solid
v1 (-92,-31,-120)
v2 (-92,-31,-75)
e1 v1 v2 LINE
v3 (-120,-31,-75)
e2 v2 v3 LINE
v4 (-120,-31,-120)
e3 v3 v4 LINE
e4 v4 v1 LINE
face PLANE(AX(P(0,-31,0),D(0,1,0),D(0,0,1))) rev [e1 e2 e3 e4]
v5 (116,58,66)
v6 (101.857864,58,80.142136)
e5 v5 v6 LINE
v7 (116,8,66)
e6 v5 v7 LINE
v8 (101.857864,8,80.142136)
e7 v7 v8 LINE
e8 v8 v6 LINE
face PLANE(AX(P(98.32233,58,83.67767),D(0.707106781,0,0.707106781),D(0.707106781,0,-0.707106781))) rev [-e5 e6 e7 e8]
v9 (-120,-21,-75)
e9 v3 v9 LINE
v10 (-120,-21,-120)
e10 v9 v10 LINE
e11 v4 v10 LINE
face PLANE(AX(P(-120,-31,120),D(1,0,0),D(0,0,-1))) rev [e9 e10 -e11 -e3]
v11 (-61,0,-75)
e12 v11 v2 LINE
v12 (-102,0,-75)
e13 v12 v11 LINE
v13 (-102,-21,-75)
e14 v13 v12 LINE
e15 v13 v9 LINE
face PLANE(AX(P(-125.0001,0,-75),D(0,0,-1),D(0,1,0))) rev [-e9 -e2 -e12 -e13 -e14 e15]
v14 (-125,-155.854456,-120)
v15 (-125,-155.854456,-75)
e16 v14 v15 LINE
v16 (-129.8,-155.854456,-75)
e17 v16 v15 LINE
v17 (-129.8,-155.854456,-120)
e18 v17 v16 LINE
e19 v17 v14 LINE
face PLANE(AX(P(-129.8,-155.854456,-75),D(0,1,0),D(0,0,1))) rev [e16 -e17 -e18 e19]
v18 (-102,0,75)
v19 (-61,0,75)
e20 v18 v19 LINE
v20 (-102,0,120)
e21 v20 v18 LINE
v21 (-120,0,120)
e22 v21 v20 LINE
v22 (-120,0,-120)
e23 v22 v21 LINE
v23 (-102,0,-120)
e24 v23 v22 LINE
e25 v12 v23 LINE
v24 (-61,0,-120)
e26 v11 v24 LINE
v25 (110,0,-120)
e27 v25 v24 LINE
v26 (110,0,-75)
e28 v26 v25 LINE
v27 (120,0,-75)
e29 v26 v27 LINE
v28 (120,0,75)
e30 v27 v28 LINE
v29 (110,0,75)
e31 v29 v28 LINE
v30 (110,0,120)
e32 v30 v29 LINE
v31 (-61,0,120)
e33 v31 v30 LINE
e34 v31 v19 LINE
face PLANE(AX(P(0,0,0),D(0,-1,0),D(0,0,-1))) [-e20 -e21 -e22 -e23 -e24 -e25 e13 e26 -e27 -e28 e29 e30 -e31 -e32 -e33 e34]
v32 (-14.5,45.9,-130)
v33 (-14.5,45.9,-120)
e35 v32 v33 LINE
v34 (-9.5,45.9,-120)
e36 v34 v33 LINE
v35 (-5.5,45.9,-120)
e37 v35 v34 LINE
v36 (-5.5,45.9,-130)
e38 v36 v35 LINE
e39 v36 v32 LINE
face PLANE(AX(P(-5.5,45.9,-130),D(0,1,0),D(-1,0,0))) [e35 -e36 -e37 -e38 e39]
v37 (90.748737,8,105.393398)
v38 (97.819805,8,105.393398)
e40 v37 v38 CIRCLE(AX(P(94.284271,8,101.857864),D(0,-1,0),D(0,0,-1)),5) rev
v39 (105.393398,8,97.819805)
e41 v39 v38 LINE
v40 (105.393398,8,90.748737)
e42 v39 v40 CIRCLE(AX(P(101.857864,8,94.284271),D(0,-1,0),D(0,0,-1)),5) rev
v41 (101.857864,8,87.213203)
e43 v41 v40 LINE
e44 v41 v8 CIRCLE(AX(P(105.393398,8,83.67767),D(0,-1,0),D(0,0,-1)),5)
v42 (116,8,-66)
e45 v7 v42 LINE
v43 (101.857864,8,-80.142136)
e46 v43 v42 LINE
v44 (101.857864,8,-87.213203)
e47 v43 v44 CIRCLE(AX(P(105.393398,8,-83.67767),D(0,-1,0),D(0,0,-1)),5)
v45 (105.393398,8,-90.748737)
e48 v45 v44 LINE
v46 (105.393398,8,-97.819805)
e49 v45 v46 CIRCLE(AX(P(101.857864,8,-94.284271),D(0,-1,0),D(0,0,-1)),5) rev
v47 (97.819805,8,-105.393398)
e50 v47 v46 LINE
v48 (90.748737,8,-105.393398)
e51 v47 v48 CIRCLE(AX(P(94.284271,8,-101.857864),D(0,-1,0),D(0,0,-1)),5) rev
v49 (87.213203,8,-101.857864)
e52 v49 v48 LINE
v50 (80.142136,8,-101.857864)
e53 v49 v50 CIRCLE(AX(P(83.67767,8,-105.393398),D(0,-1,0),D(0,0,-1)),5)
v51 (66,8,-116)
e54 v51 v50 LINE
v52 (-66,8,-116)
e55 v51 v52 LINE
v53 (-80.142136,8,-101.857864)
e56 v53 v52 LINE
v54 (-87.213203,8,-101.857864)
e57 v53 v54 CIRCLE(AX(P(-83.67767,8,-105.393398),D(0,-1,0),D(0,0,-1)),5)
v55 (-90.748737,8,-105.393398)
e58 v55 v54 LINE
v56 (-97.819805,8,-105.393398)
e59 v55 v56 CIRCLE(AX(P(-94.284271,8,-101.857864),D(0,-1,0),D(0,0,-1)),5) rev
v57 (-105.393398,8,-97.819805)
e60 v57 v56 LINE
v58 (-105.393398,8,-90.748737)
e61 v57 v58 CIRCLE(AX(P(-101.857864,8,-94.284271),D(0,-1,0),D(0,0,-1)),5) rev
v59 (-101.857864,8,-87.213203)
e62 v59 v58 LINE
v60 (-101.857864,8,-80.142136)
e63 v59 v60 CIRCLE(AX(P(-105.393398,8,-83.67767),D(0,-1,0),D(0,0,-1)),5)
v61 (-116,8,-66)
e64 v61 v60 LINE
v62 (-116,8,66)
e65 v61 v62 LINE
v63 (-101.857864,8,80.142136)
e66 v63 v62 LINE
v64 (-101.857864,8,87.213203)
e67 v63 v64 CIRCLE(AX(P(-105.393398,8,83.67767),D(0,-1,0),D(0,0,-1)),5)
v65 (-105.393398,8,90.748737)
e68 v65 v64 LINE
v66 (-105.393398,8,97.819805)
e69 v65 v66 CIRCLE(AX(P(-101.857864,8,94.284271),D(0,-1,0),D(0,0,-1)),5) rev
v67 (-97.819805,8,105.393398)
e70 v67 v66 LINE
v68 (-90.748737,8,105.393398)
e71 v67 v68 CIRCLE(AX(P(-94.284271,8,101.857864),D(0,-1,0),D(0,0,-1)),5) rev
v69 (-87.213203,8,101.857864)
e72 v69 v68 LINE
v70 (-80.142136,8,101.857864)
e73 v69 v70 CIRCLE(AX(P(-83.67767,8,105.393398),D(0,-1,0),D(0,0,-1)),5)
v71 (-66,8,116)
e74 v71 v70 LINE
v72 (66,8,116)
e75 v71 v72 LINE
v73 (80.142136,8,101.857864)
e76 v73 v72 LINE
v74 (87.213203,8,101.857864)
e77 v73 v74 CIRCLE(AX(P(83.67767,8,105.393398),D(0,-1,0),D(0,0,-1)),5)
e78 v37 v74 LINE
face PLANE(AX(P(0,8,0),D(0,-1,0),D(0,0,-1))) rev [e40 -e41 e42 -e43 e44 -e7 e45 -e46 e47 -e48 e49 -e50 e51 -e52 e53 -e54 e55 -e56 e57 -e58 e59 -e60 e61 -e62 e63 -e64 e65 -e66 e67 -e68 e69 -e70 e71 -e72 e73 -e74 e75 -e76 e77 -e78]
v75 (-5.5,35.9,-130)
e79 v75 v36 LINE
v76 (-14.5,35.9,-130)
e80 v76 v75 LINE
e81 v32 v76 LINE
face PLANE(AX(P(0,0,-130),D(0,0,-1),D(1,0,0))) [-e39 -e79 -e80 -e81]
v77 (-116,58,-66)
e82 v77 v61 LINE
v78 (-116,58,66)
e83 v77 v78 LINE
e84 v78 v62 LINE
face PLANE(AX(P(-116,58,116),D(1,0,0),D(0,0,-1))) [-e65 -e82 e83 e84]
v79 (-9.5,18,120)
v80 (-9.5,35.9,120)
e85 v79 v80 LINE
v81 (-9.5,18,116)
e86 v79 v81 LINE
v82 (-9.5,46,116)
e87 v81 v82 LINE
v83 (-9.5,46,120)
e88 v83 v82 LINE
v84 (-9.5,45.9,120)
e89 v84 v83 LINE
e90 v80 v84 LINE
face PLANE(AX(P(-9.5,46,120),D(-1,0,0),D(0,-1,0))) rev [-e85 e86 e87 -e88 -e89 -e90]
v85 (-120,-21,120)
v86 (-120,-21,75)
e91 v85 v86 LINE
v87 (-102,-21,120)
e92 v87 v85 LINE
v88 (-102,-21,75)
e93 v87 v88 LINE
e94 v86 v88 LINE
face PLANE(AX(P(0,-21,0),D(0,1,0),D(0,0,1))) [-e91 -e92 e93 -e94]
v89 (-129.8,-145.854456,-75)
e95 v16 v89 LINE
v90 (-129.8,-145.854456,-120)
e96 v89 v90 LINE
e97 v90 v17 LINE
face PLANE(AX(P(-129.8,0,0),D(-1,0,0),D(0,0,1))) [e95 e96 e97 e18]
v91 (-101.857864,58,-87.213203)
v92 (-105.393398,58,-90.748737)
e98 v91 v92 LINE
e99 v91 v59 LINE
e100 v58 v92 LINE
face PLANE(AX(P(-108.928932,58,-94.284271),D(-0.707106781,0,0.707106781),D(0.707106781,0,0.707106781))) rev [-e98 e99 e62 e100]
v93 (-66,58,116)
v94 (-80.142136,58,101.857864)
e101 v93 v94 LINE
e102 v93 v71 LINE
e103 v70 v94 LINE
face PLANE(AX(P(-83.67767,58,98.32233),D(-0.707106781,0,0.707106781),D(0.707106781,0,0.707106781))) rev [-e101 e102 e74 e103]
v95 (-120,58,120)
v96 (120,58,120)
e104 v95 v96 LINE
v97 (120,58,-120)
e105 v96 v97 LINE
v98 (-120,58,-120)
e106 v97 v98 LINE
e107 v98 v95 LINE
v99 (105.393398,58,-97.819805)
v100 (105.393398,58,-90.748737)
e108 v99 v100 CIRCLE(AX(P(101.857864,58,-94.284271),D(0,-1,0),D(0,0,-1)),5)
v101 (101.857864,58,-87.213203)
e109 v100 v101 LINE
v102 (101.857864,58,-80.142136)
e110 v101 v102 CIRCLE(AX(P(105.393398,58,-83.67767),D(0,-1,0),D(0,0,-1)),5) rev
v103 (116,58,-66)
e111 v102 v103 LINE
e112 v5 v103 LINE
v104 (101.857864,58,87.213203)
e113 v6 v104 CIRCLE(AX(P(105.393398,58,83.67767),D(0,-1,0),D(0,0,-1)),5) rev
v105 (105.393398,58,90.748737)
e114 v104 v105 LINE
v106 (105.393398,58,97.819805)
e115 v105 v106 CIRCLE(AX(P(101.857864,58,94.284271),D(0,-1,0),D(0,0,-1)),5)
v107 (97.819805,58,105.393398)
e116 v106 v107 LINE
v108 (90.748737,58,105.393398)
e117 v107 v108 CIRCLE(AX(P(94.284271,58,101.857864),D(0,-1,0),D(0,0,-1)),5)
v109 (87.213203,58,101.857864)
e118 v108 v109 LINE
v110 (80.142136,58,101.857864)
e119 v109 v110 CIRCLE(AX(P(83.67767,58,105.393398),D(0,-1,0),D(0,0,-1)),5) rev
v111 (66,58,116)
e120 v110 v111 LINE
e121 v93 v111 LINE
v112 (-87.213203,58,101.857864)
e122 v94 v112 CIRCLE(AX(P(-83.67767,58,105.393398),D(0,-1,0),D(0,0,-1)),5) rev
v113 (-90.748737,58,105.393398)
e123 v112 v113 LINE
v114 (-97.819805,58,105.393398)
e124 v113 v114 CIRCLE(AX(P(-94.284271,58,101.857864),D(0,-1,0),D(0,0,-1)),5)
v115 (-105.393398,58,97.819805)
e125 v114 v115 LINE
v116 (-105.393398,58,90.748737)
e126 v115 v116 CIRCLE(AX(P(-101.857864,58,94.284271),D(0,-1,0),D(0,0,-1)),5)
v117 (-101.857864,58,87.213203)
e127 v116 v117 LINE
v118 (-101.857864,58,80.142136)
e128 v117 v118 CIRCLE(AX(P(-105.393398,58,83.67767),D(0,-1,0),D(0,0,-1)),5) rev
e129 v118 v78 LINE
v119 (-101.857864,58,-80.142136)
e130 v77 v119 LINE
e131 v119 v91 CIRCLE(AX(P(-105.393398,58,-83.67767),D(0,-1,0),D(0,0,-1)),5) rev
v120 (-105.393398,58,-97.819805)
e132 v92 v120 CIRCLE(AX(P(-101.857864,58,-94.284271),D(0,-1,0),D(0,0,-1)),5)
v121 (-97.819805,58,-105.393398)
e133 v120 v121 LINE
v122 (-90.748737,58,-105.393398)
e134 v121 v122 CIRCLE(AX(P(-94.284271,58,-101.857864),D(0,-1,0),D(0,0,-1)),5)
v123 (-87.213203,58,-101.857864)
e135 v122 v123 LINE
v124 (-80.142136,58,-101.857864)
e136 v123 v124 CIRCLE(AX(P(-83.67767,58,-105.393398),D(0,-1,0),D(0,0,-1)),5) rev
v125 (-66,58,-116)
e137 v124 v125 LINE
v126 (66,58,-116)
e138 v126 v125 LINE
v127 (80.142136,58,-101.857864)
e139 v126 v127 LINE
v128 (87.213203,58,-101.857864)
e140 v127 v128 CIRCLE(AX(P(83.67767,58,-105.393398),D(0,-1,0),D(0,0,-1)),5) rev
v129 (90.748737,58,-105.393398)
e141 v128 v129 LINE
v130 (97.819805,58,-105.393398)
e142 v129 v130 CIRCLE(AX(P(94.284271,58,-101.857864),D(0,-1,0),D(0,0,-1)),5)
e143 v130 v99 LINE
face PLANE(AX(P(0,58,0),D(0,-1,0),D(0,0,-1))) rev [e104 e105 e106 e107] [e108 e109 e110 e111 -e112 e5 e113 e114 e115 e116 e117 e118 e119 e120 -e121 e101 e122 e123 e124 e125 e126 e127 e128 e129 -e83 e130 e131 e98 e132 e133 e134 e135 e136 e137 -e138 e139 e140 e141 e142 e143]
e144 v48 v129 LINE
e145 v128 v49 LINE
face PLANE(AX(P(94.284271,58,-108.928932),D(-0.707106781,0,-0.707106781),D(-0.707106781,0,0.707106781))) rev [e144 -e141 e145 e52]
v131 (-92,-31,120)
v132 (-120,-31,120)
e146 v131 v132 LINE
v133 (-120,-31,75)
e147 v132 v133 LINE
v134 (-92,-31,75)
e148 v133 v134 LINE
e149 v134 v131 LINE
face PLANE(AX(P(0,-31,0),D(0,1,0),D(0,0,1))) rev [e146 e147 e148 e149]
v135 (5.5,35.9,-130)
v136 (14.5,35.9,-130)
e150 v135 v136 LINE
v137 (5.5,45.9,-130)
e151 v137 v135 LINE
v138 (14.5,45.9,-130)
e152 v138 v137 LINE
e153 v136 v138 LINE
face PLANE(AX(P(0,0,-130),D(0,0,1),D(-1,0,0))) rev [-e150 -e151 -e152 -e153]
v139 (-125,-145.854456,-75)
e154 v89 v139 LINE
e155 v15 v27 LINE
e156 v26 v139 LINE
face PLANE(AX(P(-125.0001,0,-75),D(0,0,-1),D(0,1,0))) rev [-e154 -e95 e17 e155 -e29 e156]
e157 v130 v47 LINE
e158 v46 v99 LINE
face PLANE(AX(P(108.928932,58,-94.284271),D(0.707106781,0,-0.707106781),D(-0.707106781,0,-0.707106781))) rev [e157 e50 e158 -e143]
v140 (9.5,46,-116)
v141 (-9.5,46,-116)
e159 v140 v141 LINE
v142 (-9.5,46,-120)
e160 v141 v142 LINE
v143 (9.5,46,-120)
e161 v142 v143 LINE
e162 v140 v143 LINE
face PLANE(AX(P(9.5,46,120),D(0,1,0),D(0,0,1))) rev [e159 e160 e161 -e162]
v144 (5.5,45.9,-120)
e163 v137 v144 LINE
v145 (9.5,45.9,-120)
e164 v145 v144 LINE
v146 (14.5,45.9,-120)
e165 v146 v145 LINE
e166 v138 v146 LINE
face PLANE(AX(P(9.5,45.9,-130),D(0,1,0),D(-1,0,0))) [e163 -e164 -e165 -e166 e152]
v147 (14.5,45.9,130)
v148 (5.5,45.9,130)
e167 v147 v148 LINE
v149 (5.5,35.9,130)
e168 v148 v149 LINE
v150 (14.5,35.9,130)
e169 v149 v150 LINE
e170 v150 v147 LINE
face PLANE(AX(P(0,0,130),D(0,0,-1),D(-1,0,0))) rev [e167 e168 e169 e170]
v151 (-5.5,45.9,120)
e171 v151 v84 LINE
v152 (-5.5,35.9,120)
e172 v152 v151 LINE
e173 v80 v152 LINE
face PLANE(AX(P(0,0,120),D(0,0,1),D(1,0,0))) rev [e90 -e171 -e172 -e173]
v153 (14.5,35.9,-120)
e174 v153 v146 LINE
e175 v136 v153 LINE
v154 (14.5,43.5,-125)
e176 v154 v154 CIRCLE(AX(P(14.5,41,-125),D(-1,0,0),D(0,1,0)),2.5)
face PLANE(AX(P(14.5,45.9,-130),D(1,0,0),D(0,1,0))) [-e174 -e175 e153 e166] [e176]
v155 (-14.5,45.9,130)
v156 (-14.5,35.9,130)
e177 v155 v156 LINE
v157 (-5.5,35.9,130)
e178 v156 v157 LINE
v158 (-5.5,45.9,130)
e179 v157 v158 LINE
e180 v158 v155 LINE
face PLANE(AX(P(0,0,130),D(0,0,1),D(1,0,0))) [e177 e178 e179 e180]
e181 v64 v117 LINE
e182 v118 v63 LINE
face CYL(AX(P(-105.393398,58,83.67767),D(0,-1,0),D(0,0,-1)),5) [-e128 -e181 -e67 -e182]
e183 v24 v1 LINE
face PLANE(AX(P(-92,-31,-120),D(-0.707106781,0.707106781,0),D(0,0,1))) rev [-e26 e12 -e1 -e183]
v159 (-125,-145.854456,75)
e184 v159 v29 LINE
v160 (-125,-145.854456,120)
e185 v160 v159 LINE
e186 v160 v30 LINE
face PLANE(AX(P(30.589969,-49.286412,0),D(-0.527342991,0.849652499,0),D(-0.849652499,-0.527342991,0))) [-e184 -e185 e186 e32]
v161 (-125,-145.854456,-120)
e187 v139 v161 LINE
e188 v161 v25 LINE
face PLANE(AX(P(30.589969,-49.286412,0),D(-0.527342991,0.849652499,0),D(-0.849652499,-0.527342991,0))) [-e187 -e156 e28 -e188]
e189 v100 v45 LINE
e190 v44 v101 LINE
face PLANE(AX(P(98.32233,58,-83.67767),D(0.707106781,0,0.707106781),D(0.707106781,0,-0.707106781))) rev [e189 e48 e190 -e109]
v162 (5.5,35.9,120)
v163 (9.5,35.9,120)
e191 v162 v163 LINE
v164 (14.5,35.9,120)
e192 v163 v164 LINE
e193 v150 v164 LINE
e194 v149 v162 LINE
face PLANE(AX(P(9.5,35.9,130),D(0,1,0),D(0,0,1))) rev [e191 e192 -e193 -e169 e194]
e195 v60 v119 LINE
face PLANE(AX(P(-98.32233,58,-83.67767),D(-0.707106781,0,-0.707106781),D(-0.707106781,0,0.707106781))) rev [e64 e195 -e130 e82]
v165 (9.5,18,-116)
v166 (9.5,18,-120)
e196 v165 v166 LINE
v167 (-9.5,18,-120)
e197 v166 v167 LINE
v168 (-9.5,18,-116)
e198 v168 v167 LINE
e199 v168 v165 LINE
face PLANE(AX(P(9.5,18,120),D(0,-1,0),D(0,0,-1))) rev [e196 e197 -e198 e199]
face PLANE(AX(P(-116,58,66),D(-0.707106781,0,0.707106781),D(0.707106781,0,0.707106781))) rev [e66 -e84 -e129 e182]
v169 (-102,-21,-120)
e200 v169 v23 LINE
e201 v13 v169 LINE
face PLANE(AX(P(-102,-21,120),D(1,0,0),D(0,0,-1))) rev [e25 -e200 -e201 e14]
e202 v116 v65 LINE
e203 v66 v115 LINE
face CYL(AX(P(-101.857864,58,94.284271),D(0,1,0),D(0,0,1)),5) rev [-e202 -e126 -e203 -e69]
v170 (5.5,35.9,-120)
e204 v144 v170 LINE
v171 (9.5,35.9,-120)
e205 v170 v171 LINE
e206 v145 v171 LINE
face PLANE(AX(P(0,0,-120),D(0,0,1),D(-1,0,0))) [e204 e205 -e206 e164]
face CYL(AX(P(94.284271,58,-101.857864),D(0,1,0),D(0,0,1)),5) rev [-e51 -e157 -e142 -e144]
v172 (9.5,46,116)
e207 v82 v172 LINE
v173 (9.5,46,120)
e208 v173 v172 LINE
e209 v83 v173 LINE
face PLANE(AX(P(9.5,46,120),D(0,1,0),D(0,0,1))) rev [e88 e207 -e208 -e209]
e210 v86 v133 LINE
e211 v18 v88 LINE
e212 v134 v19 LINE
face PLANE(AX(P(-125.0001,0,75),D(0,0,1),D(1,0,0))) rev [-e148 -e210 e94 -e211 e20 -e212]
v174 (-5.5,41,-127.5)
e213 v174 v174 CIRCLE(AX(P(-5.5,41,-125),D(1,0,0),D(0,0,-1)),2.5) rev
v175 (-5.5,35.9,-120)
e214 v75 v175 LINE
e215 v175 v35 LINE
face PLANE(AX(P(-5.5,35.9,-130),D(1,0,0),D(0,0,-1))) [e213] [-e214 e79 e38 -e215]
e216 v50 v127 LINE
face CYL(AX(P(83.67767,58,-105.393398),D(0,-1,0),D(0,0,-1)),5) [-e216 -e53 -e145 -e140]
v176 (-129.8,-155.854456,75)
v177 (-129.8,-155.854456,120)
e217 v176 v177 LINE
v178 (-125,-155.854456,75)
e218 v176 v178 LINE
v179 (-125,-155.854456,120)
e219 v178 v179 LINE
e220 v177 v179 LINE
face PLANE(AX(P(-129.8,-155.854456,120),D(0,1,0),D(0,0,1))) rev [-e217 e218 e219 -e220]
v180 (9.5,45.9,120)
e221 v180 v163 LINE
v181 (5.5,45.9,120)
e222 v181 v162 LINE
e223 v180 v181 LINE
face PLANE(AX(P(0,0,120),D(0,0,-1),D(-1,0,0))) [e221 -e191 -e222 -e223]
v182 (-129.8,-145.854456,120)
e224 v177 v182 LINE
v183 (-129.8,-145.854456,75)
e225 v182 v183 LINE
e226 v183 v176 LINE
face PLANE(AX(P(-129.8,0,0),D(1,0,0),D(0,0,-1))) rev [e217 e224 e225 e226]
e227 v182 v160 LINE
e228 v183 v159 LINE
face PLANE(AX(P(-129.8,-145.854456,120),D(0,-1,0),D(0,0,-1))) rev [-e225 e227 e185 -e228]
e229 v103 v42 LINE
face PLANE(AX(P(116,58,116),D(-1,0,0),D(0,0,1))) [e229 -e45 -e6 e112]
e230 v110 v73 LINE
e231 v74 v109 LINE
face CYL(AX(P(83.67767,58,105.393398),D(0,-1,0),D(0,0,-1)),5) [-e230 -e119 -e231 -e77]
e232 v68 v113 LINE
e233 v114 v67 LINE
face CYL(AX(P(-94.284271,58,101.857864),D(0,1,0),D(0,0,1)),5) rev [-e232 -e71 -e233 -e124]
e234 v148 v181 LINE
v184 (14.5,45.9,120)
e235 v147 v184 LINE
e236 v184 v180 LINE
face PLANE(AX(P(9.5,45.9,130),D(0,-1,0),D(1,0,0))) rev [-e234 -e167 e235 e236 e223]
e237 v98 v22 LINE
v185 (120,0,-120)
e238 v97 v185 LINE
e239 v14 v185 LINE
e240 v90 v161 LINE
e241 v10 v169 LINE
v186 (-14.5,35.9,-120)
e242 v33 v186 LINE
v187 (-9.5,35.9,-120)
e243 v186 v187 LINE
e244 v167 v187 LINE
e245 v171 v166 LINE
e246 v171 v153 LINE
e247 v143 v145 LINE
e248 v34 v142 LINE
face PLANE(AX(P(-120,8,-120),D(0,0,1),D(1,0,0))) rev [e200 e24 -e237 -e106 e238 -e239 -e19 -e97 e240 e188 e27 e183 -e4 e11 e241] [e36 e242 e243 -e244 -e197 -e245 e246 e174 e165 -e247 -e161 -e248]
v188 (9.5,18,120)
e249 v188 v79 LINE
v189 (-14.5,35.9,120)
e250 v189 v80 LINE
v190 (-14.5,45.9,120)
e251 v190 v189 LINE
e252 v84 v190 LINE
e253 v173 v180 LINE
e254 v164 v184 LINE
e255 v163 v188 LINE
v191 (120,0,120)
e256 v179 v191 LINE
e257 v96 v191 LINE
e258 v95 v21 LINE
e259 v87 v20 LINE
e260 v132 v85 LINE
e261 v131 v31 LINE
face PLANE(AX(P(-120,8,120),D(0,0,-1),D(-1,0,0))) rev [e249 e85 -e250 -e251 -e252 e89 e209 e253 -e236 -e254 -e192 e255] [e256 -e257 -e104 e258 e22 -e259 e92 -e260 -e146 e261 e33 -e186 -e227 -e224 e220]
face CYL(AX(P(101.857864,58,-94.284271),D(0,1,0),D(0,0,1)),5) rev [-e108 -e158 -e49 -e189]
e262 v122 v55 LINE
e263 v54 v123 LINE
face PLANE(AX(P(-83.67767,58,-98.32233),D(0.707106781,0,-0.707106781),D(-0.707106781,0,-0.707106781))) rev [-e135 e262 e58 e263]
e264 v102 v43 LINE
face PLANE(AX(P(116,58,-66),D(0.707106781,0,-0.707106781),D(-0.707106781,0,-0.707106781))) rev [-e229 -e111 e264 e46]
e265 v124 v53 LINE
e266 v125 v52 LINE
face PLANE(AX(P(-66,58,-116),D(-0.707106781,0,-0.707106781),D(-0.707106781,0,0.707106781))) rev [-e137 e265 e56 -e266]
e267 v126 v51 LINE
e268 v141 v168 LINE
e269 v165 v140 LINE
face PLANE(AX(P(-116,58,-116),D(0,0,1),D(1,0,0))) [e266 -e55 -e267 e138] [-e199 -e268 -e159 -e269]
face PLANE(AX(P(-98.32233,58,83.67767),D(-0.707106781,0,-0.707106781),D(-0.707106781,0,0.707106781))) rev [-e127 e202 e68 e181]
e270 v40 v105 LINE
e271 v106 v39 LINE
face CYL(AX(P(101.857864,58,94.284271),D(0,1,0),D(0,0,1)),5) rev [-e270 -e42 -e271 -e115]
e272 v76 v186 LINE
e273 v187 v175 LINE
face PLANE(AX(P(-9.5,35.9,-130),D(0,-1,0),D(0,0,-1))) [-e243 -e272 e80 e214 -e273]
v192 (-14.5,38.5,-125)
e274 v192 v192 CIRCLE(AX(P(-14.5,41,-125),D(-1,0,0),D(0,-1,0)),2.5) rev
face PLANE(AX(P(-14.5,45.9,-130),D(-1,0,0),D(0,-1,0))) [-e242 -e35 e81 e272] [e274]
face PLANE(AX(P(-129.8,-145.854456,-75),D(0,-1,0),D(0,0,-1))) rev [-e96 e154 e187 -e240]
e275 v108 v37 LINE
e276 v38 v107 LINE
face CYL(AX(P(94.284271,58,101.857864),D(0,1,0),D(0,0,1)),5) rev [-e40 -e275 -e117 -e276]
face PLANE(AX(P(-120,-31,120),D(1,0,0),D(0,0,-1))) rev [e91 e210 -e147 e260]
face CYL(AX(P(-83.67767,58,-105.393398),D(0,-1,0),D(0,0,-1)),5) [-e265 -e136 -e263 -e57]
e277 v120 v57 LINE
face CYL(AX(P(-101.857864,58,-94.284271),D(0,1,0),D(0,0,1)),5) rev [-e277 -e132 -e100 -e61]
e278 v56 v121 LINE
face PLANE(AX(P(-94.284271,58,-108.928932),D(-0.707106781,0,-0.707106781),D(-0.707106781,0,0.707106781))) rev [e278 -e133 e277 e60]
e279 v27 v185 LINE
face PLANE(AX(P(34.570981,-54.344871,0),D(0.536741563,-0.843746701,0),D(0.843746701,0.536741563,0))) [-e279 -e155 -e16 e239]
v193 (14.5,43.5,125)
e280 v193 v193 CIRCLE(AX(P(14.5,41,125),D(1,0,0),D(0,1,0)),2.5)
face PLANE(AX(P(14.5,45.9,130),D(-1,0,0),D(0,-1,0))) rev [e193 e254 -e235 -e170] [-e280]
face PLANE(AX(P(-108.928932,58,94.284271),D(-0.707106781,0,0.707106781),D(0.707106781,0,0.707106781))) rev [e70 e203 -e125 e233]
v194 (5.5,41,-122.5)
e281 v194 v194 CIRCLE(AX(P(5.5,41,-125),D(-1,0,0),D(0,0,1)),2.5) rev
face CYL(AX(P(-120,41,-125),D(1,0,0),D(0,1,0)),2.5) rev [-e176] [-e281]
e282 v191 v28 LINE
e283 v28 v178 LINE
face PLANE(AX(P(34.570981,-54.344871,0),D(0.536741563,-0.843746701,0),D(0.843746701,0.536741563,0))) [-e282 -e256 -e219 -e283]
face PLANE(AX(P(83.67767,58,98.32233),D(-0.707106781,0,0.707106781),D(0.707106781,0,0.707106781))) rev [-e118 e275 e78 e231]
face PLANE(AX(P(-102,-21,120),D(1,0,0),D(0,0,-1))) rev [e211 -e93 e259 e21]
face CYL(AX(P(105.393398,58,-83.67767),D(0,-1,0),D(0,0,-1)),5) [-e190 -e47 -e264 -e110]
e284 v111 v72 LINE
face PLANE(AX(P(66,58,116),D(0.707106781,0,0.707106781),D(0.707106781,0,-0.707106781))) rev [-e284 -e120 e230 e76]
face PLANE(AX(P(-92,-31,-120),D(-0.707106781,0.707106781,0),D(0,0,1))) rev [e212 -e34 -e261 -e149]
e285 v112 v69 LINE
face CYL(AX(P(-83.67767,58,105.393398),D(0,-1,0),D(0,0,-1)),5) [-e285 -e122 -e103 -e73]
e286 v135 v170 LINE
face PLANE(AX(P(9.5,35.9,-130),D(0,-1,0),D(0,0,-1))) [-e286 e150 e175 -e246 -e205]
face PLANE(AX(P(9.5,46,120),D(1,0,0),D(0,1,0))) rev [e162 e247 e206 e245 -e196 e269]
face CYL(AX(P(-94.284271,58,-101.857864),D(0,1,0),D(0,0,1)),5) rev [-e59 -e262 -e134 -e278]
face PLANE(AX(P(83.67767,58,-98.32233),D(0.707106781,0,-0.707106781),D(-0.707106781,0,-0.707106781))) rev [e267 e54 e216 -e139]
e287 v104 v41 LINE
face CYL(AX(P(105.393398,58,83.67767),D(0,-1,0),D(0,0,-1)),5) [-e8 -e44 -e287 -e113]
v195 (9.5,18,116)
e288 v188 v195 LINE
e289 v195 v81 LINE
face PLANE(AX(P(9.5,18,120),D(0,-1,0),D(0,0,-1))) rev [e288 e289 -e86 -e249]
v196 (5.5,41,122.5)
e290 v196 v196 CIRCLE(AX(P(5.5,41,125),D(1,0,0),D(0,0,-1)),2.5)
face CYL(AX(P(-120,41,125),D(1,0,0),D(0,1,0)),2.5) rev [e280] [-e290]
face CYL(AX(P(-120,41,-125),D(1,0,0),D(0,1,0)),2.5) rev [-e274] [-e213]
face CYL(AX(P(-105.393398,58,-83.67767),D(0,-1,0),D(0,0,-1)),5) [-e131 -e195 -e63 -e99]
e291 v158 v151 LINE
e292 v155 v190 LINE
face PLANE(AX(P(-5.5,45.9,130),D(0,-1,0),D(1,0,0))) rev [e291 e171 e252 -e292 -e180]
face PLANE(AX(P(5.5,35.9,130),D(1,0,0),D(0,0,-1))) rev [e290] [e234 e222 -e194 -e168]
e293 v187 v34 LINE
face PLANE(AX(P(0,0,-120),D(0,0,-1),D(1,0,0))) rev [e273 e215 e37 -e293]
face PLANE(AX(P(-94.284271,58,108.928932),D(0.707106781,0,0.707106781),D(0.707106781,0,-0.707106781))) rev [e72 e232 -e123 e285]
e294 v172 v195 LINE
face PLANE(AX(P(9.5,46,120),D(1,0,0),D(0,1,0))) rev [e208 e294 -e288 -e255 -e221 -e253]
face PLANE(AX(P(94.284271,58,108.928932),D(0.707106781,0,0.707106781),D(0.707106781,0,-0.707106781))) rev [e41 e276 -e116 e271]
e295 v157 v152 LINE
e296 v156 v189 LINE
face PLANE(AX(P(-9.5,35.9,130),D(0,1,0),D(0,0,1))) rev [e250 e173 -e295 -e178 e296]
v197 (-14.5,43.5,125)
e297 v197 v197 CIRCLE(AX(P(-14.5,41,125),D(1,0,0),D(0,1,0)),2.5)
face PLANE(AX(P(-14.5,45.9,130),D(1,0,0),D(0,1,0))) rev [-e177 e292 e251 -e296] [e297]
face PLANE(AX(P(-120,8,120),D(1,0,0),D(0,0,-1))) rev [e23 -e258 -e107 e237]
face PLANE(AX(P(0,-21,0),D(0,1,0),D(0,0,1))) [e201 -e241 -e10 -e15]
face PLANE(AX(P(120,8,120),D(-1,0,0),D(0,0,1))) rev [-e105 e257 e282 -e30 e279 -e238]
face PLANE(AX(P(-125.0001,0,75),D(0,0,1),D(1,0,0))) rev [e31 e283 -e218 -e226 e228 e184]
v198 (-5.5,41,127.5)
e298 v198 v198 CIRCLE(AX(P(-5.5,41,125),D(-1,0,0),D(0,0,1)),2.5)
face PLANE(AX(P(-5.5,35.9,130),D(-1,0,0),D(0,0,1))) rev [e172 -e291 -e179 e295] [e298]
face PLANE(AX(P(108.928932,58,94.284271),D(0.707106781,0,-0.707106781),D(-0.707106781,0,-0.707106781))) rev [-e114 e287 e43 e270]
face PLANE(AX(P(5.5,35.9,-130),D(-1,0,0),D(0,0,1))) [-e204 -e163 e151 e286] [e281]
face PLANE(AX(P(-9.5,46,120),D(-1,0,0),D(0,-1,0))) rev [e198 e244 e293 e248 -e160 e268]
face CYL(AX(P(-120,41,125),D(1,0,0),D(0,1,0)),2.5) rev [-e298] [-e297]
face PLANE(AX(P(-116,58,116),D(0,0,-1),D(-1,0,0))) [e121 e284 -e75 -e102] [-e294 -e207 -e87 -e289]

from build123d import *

# Parameters (mm, degrees)
SZKIC1_W                        = 240
SZKIC1_H                        = 240
DODANIE_WYCI_GNI_CIE1_DEPTH     = 8
SZKIC2_W                        = 240
SZKIC2_H                        = 240
SZKIC2_W_2                      = 232
SZKIC2_H_2                      = 232
DODANIE_WYCI_GNI_CIE2_DEPTH     = 50
DODANIE_WYCI_GNI_CIE6_DEPTH     = 50
ZAOKR_GLENIE1_R                 = 5
SZYK_KO_OWY1_COUNT              = 4
ZAOKR_GLENIE1_OF_SZYK_KO_OWY1_R = 5
SZKIC12_W                       = 19
SZKIC12_H                       = 28
WYTNIJ_WYCI_GNI_CIE3_DEPTH      = 275.525044395
DODANIE_WYCI_GNI_CIE7_DEPTH     = 10
SZKIC16_R                       = 2.5
WYTNIJ_WYCI_GNI_CIE4_DEPTH      = 196.842411137
SZKIC5_W                        = 10
SZKIC5_H                        = 240
DODANIE_WYCI_GNI_CIE3_DEPTH     = 21
SZKIC6_W                        = 28
SZKIC6_H                        = 240
DODANIE_WYCI_GNI_CIE4_DEPTH     = 10
SFAZOWANIE2_SIZE                = 31
WYTNIJ_WYCI_GNI_CIE2_DEPTH      = 319.144010562
WYTNIJ_WYCI_GNI_CIE2_DEPTH_BACK = 319.144010562
SZKIC9_W                        = 150
SZKIC9_H                        = 155.854455748
SZKIC10_W                       = 45
SZKIC10_H                       = 10
DODANIE_WYCI_GNI_CIE5_DEPTH     = 4.8


with BuildPart() as part:
    # Szkic1 → Dodanie-wyciągnięcie1 (new body)
    with BuildSketch(Plane(origin=(0, 0, 0), x_dir=(1, 0, 0), z_dir=(0, 1, 0))):
        Rectangle(SZKIC1_W, SZKIC1_H)
    extrude(amount=DODANIE_WYCI_GNI_CIE1_DEPTH)

    # Szkic2 → Dodanie-wyciągnięcie2 (add)
    with BuildSketch(Plane(origin=(0, 8, 0), x_dir=(1, 0, 0), z_dir=(0, 1, 0))):
        Rectangle(SZKIC2_W, SZKIC2_H)
        Rectangle(SZKIC2_W_2, SZKIC2_H_2, mode=Mode.SUBTRACT)
    extrude(amount=DODANIE_WYCI_GNI_CIE2_DEPTH)

    # Szkic11 → Dodanie-wyciągnięcie6 (add)
    with BuildSketch(Plane(origin=(0, 8, 0), x_dir=(1, 0, 0), z_dir=(0, 1, 0))):
        Polygon((-116, 116), (-66, 116), (-83.67766953, 98.32233047), (-94.284271247, 108.928932188), (-108.928932188, 94.284271247), (-98.32233047, 83.67766953), (-116, 66), align=None)
    dodanie_wyci_gni_cie6 = extrude(amount=DODANIE_WYCI_GNI_CIE6_DEPTH)

    # Zaokrąglenie1
    zaokr_glenie1_edges = [part.edges().sort_by_distance(p)[0] for p in [
        (-98.32233047, 33, -83.67766953),
        (-108.928932188, 33, -94.284271247),
        (-94.284271247, 33, -108.928932188),
        (-83.67766953, 33, -98.32233047),
    ]]
    fillet(zaokr_glenie1_edges, radius=ZAOKR_GLENIE1_R)

    # Szyk kołowy1: Dodanie-wyciągnięcie6 ×4 about axis
    szyk_ko_owy1_axis = Axis((0, 0, 0), (0, 1, 0))
    for i in range(1, SZYK_KO_OWY1_COUNT):
        add(dodanie_wyci_gni_cie6.rotate(szyk_ko_owy1_axis, i * 360 / SZYK_KO_OWY1_COUNT))

    # Zaokrąglenie1 of Szyk kołowy1
    zaokr_glenie1_of_szyk_ko_owy1_edges = [part.edges().sort_by_distance(p)[0] for p in [
        (-83.67766953, 33, 98.32233047),
        (-94.284271247, 33, 108.928932188),
        (-108.928932188, 33, 94.284271247),
        (-98.32233047, 33, 83.67766953),
        (98.32233047, 33, 83.67766953),
        (108.928932188, 33, 94.284271247),
        (94.284271247, 33, 108.928932188),
        (83.67766953, 33, 98.32233047),
        (83.67766953, 33, -98.32233047),
        (94.284271247, 33, -108.928932188),
        (108.928932188, 33, -94.284271247),
        (98.32233047, 33, -83.67766953),
    ]]
    fillet(zaokr_glenie1_of_szyk_ko_owy1_edges, radius=ZAOKR_GLENIE1_OF_SZYK_KO_OWY1_R)

    # Szkic12 → Wytnij-wyciągnięcie3 (cut, through all)
    with BuildSketch(Plane(origin=(0, 0, -120), x_dir=(-1, 0, 0), z_dir=(0, 0, -1))):
        with Locations((0, 32)):
            Rectangle(SZKIC12_W, SZKIC12_H)
    extrude(amount=-WYTNIJ_WYCI_GNI_CIE3_DEPTH, mode=Mode.SUBTRACT)

    # Szkic15 → Dodanie-wyciągnięcie7 (add)
    with BuildSketch(Plane.XY.offset(120)):
        Polygon((9.5, 45.9), (14.5, 45.9), (14.5, 35.9), (9.5, 35.9), (5.5, 35.9), (5.5, 45.9), align=None)
        Polygon((-14.5, 45.9), (-14.5, 35.9), (-9.5, 35.9), (-5.5, 35.9), (-5.5, 45.9), (-9.5, 45.9), align=None)
    dodanie_wyci_gni_cie7 = extrude(amount=DODANIE_WYCI_GNI_CIE7_DEPTH)

    # Szkic16 → Wytnij-wyciągnięcie4 (cut, through all)
    with BuildSketch(Plane(origin=(14.5, 0, 0), x_dir=(0, 0, -1), z_dir=(1, 0, 0))):
        with Locations(Location((-125, 41, 0), (0, 0, 90))):
            Circle(SZKIC16_R)
    wytnij_wyci_gni_cie4 = extrude(amount=-WYTNIJ_WYCI_GNI_CIE4_DEPTH, mode=Mode.SUBTRACT)

    # Lustro1: Dodanie-wyciągnięcie7, Wytnij-wyciągnięcie4 across plane
    add(dodanie_wyci_gni_cie7.mirror(Plane.XY))
    add(wytnij_wyci_gni_cie4.mirror(Plane.XY), mode=Mode.SUBTRACT)

    # Szkic5 → Dodanie-wyciągnięcie3 (add)
    with BuildSketch(Plane.XZ):
        with Locations((-97, 0)):
            Rectangle(SZKIC5_W, SZKIC5_H)
    extrude(amount=DODANIE_WYCI_GNI_CIE3_DEPTH)

    # Szkic6 → Dodanie-wyciągnięcie4 (add)
    with BuildSketch(Plane.XZ.offset(21)):
        with Locations((-106, 0)):
            Rectangle(SZKIC6_W, SZKIC6_H)
    extrude(amount=DODANIE_WYCI_GNI_CIE4_DEPTH)

    # Sfazowanie2
    sfazowanie2_edges = [part.edges().sort_by_distance(p)[0] for p in [
        (-92, 0, 0),
    ]]
    chamfer(sfazowanie2_edges, length=SFAZOWANIE2_SIZE - 0.0001)  # a hair under: the kernel refuses the full size

    # Szkic8 → Wyciągnięcie po profilach1 section 0
    with BuildSketch(Plane.ZY.offset(125)):
        with BuildLine():
            Line((-120, -155.854455748), (120, -155.854455748))
            Line((120, -155.854455748), (120, -145.854455748))
            Line((120, -145.854455748), (-120, -145.854455748))
            Line((-120, -145.854455748), (-120, -155.854455748))
        make_face()
    # Szkic7 → Wyciągnięcie po profilach1 section 1
    with BuildSketch(Plane.XZ):
        with BuildLine():
            Line((120, 120), (110, 120))
            Line((110, 120), (110, -120))
            Line((110, -120), (120, -120))
            Line((120, -120), (120, 120))
        make_face()
    loft()

    # Szkic9 → Wytnij-wyciągnięcie2 (cut, two sides: drawn at the far end of the back side and taken through both)
    with BuildSketch(Plane(origin=(120, 0, 0), x_dir=(0, 0, -1), z_dir=(1, 0, 0)).offset(-WYTNIJ_WYCI_GNI_CIE2_DEPTH_BACK)):
        with Locations((0, -77.927227874)):
            Rectangle(SZKIC9_W, SZKIC9_H)
    extrude(amount=WYTNIJ_WYCI_GNI_CIE2_DEPTH + WYTNIJ_WYCI_GNI_CIE2_DEPTH_BACK, mode=Mode.SUBTRACT)

    # Szkic10 → Dodanie-wyciągnięcie5 (add)
    with BuildSketch(Plane.ZY.offset(125)):
        with Locations((97.5, -150.854455748)):
            Rectangle(SZKIC10_W, SZKIC10_H)
        with Locations((-97.5, -150.854455748)):
            Rectangle(SZKIC10_W, SZKIC10_H)
    extrude(amount=DODANIE_WYCI_GNI_CIE5_DEPTH)


solid = part.part
